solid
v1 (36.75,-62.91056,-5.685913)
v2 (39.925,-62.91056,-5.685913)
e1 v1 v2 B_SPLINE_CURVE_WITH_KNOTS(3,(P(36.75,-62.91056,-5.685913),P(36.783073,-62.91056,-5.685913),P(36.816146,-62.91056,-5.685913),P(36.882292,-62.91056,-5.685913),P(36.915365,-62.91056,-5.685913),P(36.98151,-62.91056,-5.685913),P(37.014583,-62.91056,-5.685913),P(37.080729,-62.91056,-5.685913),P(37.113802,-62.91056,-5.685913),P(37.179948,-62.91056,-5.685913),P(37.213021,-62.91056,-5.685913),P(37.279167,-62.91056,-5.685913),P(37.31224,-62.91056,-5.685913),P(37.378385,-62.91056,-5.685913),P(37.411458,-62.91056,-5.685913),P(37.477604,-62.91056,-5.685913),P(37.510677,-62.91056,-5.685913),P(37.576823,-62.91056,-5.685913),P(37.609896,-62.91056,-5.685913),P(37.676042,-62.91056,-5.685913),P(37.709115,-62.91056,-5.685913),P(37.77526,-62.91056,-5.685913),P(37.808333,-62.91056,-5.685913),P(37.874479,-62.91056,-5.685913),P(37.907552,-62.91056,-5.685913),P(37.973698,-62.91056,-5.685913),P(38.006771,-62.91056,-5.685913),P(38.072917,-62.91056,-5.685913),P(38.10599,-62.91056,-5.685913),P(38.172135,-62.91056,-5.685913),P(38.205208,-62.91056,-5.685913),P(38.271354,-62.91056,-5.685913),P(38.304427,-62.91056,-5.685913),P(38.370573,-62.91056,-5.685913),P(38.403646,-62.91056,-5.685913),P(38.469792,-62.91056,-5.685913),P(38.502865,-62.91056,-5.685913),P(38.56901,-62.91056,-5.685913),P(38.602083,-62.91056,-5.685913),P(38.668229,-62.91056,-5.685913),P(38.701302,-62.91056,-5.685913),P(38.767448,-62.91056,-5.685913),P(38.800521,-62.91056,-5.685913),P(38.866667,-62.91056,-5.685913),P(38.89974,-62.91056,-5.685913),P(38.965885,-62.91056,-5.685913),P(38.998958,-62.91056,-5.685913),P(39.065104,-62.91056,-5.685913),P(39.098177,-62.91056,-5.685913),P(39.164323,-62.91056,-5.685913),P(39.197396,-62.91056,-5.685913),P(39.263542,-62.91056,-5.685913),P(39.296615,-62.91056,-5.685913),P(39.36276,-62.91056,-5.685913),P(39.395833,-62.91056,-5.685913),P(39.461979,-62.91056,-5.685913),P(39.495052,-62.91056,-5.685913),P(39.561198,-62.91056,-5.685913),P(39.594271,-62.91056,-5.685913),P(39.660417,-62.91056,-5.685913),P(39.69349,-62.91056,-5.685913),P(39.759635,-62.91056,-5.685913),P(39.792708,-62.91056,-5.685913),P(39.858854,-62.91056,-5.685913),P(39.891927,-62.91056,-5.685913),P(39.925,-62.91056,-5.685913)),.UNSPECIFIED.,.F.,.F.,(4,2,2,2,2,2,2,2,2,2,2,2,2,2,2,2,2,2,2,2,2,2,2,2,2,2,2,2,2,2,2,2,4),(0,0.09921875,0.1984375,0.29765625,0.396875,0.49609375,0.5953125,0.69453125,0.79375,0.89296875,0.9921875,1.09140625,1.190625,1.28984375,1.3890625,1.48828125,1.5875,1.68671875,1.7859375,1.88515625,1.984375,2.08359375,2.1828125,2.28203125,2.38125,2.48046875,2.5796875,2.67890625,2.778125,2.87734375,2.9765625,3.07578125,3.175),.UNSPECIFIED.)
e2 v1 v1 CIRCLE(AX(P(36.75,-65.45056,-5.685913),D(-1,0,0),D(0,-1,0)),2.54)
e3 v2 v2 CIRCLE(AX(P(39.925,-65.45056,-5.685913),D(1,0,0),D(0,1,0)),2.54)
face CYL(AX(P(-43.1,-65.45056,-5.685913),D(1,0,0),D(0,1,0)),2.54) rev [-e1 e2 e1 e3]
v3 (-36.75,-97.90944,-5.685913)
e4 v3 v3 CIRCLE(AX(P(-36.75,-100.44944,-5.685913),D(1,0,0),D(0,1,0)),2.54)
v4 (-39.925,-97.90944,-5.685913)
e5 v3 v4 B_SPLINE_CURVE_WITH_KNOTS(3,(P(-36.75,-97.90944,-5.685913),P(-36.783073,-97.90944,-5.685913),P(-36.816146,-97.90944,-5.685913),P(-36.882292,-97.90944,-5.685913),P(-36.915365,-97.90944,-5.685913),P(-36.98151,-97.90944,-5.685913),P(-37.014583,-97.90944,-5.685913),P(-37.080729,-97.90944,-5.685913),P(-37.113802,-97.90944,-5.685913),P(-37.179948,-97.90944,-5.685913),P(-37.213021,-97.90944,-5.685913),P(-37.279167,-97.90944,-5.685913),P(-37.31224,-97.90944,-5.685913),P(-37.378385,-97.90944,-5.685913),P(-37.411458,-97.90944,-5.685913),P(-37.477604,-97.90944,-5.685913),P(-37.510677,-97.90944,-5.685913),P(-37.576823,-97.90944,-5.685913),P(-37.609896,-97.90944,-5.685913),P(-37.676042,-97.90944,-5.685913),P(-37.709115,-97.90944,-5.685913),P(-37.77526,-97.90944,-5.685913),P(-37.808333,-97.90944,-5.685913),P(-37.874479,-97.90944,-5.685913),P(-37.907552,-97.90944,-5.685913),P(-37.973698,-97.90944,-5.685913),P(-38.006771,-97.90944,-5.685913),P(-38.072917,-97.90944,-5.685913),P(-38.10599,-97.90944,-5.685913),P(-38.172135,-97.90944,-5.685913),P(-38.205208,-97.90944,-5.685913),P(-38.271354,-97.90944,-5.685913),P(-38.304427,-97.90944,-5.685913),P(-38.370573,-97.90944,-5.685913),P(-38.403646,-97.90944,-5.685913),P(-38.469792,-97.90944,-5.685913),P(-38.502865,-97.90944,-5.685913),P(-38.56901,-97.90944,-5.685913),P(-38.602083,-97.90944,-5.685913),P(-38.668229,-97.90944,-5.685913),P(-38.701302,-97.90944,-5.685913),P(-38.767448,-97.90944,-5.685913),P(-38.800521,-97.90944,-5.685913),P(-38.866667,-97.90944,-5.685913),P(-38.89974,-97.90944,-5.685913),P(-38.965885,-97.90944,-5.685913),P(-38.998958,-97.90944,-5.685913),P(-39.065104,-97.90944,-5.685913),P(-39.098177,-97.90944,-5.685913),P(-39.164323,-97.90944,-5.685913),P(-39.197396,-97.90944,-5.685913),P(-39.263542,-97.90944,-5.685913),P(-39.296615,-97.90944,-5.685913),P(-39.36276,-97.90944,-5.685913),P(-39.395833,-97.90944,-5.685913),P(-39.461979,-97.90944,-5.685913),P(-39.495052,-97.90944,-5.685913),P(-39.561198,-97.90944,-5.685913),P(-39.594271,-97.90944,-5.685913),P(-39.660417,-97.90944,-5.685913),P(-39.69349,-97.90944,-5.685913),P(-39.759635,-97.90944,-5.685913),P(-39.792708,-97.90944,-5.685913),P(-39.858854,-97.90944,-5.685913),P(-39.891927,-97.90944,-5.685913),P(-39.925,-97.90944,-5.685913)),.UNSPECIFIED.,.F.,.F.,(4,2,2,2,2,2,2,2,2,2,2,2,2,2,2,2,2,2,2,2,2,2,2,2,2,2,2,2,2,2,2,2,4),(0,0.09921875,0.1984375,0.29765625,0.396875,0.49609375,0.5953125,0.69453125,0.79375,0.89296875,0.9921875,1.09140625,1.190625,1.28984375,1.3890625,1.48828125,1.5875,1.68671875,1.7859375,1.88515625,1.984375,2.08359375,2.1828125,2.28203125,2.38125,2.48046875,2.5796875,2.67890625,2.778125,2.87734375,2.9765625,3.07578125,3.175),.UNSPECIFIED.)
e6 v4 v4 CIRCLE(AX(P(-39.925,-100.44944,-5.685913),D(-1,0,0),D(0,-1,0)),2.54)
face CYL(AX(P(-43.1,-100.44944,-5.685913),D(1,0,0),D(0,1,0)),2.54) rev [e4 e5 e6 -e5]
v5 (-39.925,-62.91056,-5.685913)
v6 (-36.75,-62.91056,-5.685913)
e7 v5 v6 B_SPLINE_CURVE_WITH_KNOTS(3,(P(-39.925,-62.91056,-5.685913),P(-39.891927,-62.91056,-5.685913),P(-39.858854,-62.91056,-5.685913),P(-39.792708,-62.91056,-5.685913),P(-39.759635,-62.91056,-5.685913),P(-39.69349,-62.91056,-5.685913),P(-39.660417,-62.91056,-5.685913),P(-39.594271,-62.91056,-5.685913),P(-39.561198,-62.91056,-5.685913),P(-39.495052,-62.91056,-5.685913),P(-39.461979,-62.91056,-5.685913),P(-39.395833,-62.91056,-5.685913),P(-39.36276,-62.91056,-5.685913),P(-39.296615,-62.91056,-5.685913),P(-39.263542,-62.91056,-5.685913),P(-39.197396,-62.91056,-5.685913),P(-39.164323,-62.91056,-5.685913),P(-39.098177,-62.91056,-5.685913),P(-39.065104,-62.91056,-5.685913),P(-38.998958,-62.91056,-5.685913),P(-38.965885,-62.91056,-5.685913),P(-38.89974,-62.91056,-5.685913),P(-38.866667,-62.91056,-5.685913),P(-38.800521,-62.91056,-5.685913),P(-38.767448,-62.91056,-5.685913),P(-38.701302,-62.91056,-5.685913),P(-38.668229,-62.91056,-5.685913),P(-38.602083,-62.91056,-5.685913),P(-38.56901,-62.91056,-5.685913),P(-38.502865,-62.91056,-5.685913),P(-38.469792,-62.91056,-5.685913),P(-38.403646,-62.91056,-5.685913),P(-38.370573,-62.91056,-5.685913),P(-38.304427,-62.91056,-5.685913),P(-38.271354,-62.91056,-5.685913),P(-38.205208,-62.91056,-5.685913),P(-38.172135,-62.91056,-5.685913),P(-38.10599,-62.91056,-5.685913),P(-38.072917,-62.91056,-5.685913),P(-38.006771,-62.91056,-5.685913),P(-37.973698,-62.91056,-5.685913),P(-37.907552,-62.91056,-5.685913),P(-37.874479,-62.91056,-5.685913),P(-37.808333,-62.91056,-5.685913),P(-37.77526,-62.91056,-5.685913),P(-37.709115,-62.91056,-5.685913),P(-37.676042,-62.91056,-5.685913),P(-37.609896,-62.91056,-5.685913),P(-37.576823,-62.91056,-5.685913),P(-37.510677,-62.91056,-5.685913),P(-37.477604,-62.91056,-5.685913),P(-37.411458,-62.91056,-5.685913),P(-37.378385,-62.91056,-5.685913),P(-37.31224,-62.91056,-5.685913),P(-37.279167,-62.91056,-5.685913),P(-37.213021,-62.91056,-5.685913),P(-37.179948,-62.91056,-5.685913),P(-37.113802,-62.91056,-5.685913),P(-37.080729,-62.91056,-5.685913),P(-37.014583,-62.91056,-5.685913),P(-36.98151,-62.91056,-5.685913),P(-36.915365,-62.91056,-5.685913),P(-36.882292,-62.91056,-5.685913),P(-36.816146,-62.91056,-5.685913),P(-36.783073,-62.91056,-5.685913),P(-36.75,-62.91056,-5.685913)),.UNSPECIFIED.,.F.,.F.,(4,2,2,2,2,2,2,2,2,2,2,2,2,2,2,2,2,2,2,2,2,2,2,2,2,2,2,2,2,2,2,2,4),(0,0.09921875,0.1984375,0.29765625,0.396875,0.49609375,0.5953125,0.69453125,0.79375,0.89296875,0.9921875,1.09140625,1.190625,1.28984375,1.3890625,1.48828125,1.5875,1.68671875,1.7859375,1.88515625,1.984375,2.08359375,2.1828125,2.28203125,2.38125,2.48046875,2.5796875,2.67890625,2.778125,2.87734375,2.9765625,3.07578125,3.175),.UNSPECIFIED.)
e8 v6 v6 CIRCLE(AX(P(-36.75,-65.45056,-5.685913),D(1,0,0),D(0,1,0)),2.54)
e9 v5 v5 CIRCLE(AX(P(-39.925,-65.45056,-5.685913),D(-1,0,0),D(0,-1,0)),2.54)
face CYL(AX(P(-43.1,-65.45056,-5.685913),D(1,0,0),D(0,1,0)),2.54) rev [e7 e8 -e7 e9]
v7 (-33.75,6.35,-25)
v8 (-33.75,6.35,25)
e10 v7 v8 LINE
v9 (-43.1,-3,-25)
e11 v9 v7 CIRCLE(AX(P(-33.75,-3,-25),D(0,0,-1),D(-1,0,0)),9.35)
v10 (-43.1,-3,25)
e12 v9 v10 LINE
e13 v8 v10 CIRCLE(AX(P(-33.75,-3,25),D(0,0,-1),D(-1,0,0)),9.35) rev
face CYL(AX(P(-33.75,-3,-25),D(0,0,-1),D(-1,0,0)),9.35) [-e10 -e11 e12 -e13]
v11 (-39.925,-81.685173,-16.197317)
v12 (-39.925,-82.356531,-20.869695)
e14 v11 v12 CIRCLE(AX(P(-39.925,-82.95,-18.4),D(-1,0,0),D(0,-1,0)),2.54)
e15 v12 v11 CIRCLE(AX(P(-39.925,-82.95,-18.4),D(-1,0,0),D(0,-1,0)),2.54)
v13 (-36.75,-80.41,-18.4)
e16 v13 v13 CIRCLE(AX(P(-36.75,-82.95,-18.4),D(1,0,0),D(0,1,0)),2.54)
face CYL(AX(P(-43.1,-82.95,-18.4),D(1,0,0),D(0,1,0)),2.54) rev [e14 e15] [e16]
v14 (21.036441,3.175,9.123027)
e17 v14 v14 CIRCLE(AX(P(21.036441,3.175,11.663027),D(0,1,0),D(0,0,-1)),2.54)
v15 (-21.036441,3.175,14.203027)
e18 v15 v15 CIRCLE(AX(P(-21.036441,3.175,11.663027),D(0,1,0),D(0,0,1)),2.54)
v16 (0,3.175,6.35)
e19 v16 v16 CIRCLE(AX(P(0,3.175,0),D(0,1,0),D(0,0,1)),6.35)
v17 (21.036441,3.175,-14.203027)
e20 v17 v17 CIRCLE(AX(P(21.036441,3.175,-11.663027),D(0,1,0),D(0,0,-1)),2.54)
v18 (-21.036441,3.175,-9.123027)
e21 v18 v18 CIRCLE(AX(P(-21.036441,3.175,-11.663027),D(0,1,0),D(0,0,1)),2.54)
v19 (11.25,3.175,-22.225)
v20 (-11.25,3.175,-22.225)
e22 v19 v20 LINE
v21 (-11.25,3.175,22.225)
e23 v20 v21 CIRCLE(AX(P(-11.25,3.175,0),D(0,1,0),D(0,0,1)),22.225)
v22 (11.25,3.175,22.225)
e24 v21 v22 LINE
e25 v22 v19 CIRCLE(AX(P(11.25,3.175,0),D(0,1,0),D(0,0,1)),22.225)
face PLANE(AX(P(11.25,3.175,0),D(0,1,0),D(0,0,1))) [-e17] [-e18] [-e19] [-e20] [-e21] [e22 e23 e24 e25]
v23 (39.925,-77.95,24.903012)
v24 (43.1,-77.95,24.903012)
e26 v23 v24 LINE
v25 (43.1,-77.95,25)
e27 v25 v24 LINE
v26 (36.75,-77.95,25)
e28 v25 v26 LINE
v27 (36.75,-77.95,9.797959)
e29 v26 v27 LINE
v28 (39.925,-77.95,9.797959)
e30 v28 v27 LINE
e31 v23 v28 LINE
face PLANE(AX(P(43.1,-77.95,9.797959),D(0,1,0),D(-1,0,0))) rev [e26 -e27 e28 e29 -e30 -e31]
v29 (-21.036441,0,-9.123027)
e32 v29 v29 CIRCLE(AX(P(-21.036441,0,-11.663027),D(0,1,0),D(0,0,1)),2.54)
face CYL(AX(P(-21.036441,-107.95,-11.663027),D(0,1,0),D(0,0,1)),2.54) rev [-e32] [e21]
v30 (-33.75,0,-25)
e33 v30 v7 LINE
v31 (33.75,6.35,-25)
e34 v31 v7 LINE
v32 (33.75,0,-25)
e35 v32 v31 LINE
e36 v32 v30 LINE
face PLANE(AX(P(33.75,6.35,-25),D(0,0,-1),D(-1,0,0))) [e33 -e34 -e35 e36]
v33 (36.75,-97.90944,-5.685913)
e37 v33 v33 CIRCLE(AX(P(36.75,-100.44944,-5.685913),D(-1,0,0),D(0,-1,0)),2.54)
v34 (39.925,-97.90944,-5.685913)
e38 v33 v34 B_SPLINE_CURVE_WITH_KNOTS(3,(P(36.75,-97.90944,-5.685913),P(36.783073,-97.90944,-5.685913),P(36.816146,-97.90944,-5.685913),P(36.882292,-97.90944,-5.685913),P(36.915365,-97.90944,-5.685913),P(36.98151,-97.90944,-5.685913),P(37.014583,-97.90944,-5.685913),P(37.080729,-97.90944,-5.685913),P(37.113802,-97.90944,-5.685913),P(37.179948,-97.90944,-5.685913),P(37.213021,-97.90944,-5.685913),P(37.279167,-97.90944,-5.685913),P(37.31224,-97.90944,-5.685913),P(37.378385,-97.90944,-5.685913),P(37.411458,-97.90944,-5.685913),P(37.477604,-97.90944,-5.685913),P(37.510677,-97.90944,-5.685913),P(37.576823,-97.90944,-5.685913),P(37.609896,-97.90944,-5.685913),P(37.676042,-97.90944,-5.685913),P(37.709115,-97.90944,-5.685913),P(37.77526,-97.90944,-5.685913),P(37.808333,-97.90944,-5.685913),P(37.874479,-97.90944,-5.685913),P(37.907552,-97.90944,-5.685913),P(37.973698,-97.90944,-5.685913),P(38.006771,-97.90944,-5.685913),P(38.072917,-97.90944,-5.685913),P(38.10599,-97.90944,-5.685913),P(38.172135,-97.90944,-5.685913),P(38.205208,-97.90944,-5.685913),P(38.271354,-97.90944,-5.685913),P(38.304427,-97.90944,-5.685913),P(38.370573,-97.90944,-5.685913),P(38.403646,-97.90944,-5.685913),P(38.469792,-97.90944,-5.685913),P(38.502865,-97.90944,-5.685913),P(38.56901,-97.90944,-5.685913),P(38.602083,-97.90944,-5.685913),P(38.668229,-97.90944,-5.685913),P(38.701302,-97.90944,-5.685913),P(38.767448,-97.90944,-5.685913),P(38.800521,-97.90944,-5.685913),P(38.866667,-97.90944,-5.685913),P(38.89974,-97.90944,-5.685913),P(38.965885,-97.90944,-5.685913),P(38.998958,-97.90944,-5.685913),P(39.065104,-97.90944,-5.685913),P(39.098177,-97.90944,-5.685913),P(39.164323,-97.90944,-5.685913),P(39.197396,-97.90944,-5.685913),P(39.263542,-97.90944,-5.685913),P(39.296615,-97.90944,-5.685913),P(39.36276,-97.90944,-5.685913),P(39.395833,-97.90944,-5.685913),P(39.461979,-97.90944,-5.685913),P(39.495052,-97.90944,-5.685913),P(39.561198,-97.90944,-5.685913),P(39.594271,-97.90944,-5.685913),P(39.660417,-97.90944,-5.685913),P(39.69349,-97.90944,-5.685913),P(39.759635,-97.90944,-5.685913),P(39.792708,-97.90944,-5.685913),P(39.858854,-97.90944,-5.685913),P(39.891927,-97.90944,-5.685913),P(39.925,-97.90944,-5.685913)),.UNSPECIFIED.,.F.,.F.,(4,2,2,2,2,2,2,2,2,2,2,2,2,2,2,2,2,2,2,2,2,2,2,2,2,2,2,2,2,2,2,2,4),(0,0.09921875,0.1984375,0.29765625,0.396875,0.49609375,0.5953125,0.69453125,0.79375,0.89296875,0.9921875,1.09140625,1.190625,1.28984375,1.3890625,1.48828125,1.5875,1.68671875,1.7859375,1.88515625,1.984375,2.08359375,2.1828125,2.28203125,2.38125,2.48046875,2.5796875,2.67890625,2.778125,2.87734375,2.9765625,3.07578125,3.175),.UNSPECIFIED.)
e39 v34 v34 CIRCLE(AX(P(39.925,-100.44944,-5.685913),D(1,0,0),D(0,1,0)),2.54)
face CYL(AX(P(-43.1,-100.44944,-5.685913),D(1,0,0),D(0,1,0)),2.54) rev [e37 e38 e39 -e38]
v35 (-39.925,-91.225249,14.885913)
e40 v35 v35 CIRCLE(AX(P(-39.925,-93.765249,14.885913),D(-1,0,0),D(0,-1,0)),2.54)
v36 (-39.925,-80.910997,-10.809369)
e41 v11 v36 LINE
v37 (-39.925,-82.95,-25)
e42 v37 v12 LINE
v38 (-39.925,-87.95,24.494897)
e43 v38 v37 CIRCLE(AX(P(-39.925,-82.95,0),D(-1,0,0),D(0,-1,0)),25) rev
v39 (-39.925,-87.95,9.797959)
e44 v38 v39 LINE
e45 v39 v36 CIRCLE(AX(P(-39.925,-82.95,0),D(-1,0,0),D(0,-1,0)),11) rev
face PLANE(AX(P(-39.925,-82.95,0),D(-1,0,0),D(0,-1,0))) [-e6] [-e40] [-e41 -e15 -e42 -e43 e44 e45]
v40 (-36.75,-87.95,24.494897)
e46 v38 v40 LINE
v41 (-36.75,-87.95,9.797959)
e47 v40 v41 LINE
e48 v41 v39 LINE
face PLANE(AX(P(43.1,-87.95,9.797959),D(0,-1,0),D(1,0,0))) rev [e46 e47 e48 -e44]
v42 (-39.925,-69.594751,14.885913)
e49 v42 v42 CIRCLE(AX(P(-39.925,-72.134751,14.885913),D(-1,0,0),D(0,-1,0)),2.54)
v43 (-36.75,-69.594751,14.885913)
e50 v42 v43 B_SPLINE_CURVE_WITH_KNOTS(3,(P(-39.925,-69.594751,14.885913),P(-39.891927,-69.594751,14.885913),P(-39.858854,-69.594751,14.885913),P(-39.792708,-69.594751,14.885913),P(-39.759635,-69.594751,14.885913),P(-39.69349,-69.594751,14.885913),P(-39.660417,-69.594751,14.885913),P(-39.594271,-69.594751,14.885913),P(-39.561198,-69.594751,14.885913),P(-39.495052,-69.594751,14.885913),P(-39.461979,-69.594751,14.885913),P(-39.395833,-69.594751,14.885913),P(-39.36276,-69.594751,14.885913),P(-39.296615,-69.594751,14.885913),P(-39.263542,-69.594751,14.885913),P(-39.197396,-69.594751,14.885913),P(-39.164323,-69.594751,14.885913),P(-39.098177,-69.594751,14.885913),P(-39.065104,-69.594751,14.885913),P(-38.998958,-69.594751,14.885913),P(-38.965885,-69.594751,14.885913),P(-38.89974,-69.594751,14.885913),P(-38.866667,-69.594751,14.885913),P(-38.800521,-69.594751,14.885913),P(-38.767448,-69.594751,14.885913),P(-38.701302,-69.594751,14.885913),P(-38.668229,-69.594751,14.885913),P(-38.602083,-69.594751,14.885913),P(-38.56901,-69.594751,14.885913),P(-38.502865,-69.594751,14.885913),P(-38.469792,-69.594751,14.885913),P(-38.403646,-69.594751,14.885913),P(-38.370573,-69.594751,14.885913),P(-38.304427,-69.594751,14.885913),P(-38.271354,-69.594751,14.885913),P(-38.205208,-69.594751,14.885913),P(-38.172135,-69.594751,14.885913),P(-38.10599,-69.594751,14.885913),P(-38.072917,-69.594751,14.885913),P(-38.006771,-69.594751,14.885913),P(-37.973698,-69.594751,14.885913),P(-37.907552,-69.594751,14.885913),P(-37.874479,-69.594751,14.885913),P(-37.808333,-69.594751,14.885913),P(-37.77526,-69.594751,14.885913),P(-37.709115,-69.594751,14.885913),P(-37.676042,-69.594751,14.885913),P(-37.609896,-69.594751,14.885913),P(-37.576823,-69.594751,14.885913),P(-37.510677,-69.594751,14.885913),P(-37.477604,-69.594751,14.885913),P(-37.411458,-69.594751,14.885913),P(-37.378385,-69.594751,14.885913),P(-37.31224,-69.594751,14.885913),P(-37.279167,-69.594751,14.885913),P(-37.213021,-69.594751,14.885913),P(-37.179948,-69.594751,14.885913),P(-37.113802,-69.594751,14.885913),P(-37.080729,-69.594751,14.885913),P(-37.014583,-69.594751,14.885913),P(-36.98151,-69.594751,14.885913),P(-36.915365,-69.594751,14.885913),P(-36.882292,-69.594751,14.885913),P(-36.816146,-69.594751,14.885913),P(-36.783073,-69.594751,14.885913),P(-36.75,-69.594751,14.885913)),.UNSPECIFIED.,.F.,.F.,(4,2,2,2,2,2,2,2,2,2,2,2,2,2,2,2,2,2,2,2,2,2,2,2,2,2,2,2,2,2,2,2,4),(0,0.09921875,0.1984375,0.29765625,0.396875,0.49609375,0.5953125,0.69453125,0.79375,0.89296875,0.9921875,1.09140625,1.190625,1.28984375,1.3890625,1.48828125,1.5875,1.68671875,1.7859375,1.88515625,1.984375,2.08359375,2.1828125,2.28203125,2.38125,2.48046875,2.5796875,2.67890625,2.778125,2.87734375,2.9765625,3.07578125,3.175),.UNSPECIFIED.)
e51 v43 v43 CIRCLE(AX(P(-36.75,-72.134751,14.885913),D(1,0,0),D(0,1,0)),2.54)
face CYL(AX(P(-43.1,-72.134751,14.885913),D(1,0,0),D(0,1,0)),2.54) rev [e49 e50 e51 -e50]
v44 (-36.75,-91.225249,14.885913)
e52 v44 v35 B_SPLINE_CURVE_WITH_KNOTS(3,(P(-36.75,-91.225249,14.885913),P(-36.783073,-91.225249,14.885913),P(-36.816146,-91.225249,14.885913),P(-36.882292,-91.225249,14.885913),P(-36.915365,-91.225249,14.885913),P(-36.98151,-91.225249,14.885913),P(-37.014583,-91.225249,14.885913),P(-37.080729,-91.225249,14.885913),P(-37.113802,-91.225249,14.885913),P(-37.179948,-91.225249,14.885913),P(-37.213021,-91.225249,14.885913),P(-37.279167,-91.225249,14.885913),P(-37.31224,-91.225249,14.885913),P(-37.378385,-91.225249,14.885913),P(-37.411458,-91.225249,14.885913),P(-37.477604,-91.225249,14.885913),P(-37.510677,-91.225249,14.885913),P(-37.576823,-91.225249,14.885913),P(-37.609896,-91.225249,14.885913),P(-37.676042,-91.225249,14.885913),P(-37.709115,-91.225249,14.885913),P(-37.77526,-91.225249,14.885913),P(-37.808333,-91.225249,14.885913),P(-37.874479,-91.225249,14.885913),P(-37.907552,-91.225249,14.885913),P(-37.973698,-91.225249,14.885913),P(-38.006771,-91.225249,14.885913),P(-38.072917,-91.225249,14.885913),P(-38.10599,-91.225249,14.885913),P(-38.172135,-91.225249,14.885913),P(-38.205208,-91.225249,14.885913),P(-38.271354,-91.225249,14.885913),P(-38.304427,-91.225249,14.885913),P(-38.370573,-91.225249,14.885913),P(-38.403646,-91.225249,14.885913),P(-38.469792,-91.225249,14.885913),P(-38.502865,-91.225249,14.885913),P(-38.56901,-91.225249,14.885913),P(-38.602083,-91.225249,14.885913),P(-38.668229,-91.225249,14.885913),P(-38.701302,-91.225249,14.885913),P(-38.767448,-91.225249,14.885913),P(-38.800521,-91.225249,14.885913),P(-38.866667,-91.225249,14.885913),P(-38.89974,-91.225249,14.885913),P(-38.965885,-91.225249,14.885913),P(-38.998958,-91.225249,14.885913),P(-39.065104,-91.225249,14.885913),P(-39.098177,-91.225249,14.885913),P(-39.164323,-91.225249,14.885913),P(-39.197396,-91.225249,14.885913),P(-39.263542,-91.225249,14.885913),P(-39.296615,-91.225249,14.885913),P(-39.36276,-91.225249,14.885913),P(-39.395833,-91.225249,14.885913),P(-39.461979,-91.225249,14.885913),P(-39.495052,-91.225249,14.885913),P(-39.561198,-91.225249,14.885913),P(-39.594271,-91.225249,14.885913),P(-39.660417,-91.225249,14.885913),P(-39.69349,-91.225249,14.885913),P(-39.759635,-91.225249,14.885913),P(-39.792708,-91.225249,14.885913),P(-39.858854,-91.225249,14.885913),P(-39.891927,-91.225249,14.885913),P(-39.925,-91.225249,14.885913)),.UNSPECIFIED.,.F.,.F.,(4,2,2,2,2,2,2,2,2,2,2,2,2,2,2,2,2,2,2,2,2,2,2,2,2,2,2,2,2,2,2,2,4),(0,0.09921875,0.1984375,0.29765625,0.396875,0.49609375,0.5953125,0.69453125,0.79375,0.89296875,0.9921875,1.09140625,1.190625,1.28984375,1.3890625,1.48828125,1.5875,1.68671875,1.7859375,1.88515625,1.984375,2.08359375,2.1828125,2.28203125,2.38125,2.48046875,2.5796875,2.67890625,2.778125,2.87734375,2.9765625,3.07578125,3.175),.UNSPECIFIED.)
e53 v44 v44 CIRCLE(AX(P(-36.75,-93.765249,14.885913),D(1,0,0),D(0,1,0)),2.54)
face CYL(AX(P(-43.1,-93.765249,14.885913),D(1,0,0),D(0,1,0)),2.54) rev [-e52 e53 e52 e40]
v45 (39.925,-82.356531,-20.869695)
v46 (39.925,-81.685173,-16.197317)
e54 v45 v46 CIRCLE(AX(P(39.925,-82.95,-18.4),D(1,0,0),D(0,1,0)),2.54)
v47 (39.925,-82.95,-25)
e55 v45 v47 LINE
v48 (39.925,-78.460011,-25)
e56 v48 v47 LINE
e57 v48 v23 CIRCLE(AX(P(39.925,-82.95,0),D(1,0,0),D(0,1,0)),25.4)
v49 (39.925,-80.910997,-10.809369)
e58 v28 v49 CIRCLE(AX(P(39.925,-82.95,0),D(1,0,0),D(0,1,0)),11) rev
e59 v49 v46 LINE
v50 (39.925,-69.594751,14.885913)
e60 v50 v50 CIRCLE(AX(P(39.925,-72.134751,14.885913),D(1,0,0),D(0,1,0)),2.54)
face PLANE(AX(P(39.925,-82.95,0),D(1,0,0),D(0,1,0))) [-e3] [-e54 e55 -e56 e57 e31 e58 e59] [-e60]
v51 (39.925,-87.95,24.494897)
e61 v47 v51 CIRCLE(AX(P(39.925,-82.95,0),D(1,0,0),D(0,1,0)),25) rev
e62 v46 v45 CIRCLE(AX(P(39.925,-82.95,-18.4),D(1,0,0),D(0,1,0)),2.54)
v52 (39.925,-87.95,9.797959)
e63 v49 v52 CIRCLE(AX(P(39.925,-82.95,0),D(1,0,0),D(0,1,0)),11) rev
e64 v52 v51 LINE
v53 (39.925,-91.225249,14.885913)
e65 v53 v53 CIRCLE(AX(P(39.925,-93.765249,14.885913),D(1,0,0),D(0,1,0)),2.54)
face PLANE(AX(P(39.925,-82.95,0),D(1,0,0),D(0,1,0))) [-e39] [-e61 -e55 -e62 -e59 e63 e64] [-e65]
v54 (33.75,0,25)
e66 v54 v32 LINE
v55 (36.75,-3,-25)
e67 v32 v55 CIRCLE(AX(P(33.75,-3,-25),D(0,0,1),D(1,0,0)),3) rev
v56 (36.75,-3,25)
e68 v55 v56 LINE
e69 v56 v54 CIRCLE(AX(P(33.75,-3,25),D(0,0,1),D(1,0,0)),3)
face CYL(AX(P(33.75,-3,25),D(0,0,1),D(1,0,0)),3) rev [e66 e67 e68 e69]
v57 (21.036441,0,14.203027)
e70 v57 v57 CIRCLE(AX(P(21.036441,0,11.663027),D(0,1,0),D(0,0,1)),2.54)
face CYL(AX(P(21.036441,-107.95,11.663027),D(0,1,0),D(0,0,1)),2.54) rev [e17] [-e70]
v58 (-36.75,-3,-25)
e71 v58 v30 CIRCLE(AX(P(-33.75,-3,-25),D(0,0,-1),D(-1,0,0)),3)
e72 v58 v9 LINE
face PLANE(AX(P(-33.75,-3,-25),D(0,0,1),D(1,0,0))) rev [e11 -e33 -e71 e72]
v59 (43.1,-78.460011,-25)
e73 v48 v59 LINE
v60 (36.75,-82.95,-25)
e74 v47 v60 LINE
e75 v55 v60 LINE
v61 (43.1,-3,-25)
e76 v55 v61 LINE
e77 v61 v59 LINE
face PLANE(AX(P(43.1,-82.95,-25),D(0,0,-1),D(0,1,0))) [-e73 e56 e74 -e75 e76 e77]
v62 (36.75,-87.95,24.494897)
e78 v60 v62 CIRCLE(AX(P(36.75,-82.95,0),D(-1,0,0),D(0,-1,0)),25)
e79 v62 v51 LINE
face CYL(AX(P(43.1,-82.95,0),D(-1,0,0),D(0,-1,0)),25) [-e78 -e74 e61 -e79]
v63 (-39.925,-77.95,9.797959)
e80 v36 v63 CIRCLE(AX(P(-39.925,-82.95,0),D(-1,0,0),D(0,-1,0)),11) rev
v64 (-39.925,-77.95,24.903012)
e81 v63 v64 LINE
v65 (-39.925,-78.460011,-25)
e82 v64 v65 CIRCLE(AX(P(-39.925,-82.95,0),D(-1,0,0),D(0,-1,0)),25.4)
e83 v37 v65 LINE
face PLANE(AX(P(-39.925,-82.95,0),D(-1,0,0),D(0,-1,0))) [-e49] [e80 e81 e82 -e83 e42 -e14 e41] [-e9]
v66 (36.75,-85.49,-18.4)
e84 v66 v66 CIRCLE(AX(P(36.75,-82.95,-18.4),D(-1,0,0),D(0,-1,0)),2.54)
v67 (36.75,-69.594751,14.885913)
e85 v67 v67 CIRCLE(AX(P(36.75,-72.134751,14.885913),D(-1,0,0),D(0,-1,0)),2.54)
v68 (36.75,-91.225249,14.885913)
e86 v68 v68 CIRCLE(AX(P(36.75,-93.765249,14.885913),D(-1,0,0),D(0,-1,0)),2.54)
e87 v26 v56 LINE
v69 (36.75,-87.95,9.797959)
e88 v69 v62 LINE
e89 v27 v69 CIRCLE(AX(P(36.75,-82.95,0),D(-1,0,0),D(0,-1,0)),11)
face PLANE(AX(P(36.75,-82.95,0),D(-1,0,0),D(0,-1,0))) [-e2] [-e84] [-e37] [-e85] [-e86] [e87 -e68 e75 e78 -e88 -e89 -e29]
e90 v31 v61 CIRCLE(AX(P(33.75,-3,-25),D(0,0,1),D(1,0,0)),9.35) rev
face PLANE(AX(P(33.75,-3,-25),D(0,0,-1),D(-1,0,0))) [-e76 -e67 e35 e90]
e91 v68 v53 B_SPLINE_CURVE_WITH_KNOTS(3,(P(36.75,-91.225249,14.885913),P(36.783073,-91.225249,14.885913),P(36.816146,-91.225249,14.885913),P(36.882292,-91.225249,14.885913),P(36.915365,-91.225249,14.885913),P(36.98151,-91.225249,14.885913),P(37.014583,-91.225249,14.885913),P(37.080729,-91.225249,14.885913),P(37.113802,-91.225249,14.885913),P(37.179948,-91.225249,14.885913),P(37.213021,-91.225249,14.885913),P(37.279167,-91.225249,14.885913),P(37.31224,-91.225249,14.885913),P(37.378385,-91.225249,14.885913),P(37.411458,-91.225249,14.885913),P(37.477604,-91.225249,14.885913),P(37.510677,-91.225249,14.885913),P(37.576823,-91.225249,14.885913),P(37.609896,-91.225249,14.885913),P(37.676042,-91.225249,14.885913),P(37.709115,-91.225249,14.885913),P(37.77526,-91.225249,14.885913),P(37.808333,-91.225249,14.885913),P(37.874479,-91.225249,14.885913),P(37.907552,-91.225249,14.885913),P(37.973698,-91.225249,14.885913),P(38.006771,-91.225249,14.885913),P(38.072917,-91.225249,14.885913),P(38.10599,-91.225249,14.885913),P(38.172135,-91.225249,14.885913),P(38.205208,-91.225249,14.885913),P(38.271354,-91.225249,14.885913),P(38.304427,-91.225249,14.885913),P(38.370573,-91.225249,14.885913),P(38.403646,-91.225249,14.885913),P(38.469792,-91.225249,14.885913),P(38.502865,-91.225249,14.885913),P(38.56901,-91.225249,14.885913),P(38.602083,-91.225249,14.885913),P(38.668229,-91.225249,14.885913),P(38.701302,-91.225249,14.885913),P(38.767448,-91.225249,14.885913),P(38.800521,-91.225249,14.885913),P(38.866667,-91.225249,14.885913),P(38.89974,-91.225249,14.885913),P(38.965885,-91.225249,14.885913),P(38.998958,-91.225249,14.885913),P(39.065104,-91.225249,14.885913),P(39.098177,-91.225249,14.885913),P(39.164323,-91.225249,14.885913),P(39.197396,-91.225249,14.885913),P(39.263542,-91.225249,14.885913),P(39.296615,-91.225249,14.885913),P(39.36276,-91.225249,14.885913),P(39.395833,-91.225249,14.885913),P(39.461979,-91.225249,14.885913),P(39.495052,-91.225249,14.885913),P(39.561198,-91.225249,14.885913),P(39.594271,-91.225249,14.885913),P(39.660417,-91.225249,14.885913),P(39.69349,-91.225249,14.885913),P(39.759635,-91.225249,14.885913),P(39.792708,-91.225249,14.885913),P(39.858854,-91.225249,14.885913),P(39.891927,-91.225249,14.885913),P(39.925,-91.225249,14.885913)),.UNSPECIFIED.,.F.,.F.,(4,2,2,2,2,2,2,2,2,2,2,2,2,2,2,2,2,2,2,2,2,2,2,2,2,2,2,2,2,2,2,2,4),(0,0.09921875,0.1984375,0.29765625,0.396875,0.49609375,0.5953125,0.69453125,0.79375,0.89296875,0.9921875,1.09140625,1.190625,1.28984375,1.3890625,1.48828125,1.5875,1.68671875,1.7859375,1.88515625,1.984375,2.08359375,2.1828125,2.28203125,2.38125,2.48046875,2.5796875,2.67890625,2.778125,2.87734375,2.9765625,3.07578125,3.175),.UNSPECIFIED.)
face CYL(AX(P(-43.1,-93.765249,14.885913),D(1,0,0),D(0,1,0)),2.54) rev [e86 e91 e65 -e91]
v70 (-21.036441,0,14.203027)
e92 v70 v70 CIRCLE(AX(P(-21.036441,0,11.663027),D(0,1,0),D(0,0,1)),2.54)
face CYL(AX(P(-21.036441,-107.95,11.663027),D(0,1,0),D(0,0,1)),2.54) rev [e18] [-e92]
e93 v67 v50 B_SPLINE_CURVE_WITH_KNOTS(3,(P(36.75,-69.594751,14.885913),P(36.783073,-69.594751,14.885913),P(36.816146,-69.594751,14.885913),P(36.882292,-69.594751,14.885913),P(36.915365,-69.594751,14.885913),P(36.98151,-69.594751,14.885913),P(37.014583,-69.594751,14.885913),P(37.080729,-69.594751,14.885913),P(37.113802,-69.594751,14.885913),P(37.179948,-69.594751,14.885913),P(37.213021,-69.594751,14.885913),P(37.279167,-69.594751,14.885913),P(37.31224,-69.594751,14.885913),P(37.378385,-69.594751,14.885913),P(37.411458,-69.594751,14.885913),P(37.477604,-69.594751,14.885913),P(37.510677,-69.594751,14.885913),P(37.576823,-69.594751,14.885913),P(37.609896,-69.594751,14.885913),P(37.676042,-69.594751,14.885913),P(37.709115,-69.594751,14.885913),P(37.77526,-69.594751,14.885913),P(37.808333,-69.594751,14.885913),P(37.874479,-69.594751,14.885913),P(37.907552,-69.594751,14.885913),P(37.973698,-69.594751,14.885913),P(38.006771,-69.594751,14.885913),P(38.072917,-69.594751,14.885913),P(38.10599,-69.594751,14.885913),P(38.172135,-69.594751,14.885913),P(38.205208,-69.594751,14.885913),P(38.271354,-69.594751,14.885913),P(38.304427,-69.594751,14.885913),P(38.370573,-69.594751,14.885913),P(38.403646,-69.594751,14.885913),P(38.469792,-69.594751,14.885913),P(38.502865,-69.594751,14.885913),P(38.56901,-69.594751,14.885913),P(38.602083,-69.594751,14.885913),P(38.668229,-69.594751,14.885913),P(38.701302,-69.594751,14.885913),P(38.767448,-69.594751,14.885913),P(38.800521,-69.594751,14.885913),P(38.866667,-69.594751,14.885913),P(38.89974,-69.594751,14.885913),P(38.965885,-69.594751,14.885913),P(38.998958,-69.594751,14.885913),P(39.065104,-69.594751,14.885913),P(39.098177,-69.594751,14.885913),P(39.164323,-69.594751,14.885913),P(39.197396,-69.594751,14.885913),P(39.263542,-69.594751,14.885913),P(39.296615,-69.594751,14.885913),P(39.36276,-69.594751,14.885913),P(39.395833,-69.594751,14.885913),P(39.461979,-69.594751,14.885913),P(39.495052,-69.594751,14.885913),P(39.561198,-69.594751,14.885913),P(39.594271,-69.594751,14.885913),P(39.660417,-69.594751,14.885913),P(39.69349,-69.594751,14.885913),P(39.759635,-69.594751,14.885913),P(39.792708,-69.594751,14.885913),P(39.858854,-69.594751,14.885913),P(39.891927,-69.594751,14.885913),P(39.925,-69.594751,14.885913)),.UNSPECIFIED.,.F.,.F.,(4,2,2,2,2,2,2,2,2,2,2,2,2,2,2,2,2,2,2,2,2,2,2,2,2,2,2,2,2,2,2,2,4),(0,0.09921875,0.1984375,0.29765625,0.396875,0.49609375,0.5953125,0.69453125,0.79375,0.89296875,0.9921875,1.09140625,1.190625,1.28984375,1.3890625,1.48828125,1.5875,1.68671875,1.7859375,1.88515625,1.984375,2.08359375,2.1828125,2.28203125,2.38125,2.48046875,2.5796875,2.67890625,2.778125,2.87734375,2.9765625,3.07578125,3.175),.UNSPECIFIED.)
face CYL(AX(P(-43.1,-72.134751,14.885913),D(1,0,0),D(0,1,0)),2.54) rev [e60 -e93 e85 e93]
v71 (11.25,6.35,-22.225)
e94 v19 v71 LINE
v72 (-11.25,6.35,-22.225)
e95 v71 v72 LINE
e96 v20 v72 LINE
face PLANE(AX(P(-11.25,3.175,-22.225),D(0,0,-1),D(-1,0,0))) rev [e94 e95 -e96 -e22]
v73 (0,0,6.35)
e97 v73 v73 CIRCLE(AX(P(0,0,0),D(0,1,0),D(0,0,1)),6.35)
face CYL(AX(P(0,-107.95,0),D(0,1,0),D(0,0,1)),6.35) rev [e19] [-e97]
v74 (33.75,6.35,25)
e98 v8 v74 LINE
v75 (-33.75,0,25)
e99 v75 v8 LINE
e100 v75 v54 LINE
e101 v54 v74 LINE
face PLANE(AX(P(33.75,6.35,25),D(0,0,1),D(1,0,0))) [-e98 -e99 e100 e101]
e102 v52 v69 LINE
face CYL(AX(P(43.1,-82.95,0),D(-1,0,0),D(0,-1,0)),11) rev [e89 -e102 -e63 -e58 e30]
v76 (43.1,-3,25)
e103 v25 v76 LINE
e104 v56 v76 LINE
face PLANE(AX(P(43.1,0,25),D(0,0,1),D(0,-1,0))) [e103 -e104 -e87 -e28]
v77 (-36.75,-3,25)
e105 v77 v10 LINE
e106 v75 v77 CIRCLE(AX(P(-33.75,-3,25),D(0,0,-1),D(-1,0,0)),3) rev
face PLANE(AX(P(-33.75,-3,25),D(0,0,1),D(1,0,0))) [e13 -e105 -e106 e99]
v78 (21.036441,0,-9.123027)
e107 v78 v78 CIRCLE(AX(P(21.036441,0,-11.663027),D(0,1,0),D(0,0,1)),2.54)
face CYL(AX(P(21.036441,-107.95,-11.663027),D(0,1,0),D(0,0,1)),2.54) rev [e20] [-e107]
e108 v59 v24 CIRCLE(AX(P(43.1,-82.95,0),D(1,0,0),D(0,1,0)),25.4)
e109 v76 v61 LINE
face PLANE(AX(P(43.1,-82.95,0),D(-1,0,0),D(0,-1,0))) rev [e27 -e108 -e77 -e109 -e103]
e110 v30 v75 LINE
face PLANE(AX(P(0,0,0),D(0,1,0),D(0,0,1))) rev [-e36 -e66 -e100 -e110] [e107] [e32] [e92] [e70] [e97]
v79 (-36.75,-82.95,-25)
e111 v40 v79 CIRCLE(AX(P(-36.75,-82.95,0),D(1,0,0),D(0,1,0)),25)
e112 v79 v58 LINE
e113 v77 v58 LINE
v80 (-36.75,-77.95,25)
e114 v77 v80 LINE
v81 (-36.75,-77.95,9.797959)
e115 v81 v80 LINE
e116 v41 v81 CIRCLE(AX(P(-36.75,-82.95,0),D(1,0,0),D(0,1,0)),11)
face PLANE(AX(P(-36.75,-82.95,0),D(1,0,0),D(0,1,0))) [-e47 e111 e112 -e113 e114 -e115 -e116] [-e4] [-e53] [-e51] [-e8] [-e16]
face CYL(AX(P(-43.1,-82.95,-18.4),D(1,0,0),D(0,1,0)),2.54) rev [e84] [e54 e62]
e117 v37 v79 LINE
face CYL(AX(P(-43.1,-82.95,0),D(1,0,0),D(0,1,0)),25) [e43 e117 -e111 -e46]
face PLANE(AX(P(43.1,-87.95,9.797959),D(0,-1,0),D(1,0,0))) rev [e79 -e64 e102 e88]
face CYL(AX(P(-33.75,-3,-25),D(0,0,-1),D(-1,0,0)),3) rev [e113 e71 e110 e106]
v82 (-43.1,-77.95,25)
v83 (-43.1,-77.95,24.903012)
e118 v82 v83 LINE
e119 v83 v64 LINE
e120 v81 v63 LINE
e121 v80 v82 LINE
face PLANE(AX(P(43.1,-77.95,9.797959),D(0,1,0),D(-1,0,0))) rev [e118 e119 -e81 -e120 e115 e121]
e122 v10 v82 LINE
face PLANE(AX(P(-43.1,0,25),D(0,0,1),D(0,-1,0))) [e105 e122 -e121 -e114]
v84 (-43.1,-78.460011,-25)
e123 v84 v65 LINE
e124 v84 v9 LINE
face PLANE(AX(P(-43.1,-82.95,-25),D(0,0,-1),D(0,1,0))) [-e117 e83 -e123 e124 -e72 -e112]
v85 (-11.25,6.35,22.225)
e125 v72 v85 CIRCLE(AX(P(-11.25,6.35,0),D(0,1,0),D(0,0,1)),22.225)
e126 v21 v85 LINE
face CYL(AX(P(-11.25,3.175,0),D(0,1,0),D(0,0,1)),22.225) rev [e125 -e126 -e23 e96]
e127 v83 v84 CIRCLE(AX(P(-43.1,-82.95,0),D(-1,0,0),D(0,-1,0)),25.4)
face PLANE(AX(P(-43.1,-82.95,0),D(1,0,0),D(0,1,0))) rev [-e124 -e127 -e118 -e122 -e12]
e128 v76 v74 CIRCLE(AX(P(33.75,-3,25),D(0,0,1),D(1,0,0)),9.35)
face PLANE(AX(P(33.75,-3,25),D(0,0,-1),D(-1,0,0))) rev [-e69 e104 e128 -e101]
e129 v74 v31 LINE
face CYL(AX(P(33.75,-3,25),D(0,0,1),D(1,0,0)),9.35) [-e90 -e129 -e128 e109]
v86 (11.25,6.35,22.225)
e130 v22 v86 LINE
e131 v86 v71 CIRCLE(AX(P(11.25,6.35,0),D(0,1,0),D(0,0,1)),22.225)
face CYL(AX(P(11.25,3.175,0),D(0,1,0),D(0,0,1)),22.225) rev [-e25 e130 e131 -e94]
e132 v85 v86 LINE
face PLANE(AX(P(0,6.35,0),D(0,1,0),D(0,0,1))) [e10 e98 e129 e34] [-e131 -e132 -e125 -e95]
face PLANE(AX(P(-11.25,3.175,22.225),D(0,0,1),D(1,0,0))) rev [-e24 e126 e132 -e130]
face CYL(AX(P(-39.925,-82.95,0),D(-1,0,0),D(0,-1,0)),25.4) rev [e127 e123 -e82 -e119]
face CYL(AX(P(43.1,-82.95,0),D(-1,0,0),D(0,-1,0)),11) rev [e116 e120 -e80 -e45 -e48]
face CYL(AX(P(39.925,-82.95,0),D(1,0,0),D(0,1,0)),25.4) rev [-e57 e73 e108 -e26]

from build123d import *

# Parameters (mm, degrees)
SKETCH1_W                 = 67.5
SKETCH1_H                 = 50
BOSS_EXTRUDE1_DEPTH       = 6.35
EDGE_FLANGE1_DEPTH        = 50
EDGE_FLANGE1_START        = -6.35
EDGE_FLANGE1_FLAT_DEPTH   = 6.35
EDGE_FLANGE1_BEND_DEPTH   = 50
EDGE_FLANGE1_FLAT_2_DEPTH = 6.35
CUT_EXTRUDE1_DEPTH        = 141.387472732
CUT_EXTRUDE3_DEPTH        = 3.175
SKETCH16_R                = 2.54
CUT_EXTRUDE4_DEPTH        = 122.784135358
SKETCH17_R                = 6.35
CUT_EXTRUDE5_DEPTH        = 122.784135358
SKETCH18_R                = 25.4
CUT_EXTRUDE6_DEPTH        = 3.175
CUT_EXTRUDE7_START        = -3.175
SKETCH19_R                = 25.4
CUT_EXTRUDE7_DEPTH        = 3.175
SKETCH20_R                = 2.54
CUT_EXTRUDE8_DEPTH        = 139.460655513


# Sheet-metal steps are written as plain solids
with BuildPart() as part:
    # Sketch1 → Boss-Extrude1 (new body)
    with BuildSketch(Plane(origin=(0, 0, 0), x_dir=(1, 0, 0), z_dir=(0, 1, 0))):
        Rectangle(SKETCH1_W, SKETCH1_H)
    extrude(amount=BOSS_EXTRUDE1_DEPTH)

    # Edge-Flange1 bend section (across the edge) → Edge-Flange1 (add)
    with BuildSketch(Plane(origin=(36.75, 0, -25), x_dir=(-1, 0, 0), z_dir=(0, 0, 1))):
        with BuildLine():
            Line((-6.35, 3), (0, 3))
            ThreePointArc((0, 3), (0.878679656, 0.878679656), (3, 0))
            Line((3, 0), (3, -6.35))
            ThreePointArc((3, -6.35), (-3.611448404, -3.611448404), (-6.35, 3))
        make_face()
    extrude(amount=EDGE_FLANGE1_DEPTH)

    # Edge-Flange1 profile (on flange) → Edge-Flange1 flat (add)
    with BuildSketch(Plane(origin=(36.75, 0, 0), x_dir=(0, 0, -1), z_dir=(-1, 0, 0)).offset(EDGE_FLANGE1_START)):
        with BuildLine():
            ThreePointArc((25, 82.95), (0, 107.95), (-25, 82.95))
            Line((-25, 82.95), (-25, 3))
            Line((-25, 3), (25, 3))
            Line((25, 3), (25, 82.95))
        make_face()
    extrude(amount=EDGE_FLANGE1_FLAT_DEPTH)

    # Edge-Flange1 bend section 2 (across the edge) → Edge-Flange1 bend (add)
    with BuildSketch(Plane(origin=(-36.75, 0, 25), x_dir=(1, 0, 0), z_dir=(0, 0, -1))):
        with BuildLine():
            Line((-6.35, 3), (0, 3))
            ThreePointArc((0, 3), (0.878679656, 0.878679656), (3, 0))
            Line((3, 0), (3, -6.35))
            ThreePointArc((3, -6.35), (-3.611448404, -3.611448404), (-6.35, 3))
        make_face()
    extrude(amount=EDGE_FLANGE1_BEND_DEPTH)

    # Edge-Flange1 profile 2 (on flange) → Edge-Flange1 flat 2 (add)
    with BuildSketch(Plane(origin=(-36.75, 0, 0), x_dir=(0, 0, 1), z_dir=(1, 0, 0)).offset(EDGE_FLANGE1_START)):
        with BuildLine():
            ThreePointArc((25, 82.95), (0, 107.95), (-25, 82.95))
            Line((-25, 82.95), (-25, 3))
            Line((-25, 3), (25, 3))
            Line((25, 3), (25, 82.95))
        make_face()
    extrude(amount=EDGE_FLANGE1_FLAT_2_DEPTH)

    # Sketch13 → Cut-Extrude1 (cut, through all)
    with BuildSketch(Plane.ZY.offset(43.1)):
        with BuildLine():
            Line((9.797958971, -87.95), (25, -87.95))
            Line((25, -87.95), (25, -77.95))
            Line((25, -77.95), (9.797958971, -77.95))
            ThreePointArc((9.797958971, -77.95), (-11, -82.95), (9.797958971, -87.95))
        make_face()
    extrude(amount=-CUT_EXTRUDE1_DEPTH, mode=Mode.SUBTRACT)

    # Sketch15 → Cut-Extrude3 (cut)
    with BuildSketch(Plane(origin=(0, 6.35, 0), x_dir=(1, 0, 0), z_dir=(0, 1, 0))):
        with BuildLine():
            Line((-11.25, 22.225), (11.25, 22.225))
            ThreePointArc((11.25, 22.225), (33.475, 0), (11.25, -22.225))
            Line((11.25, -22.225), (-11.25, -22.225))
            ThreePointArc((-11.25, -22.225), (-33.475, 0), (-11.25, 22.225))
        make_face()
    extrude(amount=-CUT_EXTRUDE3_DEPTH, mode=Mode.SUBTRACT)

    # Sketch16 → Cut-Extrude4 (cut, through all)
    with BuildSketch(Plane(origin=(0, 3.175, 0), x_dir=(1, 0, 0), z_dir=(0, 1, 0))):
        with Locations(Location((-21.036441357, -11.663026646, 0), (0, 0, 270))):
            Circle(SKETCH16_R)
        with Locations(Location((-21.036441357, 11.663026646, 0), (0, 0, 270))):
            Circle(SKETCH16_R)
        with Locations(Location((21.036441357, 11.663026646, 0), (0, 0, 270))):
            Circle(SKETCH16_R)
        with Locations(Location((21.036441357, -11.663026646, 0), (0, 0, 270))):
            Circle(SKETCH16_R)
    extrude(amount=-CUT_EXTRUDE4_DEPTH, mode=Mode.SUBTRACT)

    # Sketch17 → Cut-Extrude5 (cut, through all)
    with BuildSketch(Plane(origin=(0, 3.175, 0), x_dir=(1, 0, 0), z_dir=(0, 1, 0))):
        with Locations(Location((0, 0, 0), (0, 0, 270))):
            Circle(SKETCH17_R)
    extrude(amount=-CUT_EXTRUDE5_DEPTH, mode=Mode.SUBTRACT)

    # Sketch18 → Cut-Extrude6 (cut)
    with BuildSketch(Plane.ZY.offset(43.1)):
        with Locations((0, -82.95)):
            Circle(SKETCH18_R)
    extrude(amount=-CUT_EXTRUDE6_DEPTH, mode=Mode.SUBTRACT)

    # Sketch19 → Cut-Extrude7 (cut)
    with BuildSketch(Plane(origin=(43.1, 0, 0), x_dir=(0, 0, -1), z_dir=(1, 0, 0)).offset(CUT_EXTRUDE7_START)):
        with Locations((0, -82.95)):
            Circle(SKETCH19_R)
    extrude(amount=CUT_EXTRUDE7_DEPTH, mode=Mode.SUBTRACT)

    # Sketch20 → Cut-Extrude8 (cut, through all)
    with BuildSketch(Plane(origin=(39.925, 0, 0), x_dir=(0, 0, -1), z_dir=(1, 0, 0))):
        with Locations(Location((18.4, -82.95, 0), (0, 0, 150.134638176))):
            Circle(SKETCH20_R)
        with Locations(Location((5.685912696, -100.4494399, 0), (0, 0, 90))):
            Circle(SKETCH20_R)
        with Locations(Location((-14.885912696, -93.765248642, 0), (0, 0, 90))):
            Circle(SKETCH20_R)
        with Locations(Location((-14.885912696, -72.134751358, 0), (0, 0, 90))):
            Circle(SKETCH20_R)
        with Locations(Location((5.685912696, -65.4505601, 0), (0, 0, 90))):
            Circle(SKETCH20_R)
    extrude(amount=-CUT_EXTRUDE8_DEPTH, mode=Mode.SUBTRACT)


solid = part.part
